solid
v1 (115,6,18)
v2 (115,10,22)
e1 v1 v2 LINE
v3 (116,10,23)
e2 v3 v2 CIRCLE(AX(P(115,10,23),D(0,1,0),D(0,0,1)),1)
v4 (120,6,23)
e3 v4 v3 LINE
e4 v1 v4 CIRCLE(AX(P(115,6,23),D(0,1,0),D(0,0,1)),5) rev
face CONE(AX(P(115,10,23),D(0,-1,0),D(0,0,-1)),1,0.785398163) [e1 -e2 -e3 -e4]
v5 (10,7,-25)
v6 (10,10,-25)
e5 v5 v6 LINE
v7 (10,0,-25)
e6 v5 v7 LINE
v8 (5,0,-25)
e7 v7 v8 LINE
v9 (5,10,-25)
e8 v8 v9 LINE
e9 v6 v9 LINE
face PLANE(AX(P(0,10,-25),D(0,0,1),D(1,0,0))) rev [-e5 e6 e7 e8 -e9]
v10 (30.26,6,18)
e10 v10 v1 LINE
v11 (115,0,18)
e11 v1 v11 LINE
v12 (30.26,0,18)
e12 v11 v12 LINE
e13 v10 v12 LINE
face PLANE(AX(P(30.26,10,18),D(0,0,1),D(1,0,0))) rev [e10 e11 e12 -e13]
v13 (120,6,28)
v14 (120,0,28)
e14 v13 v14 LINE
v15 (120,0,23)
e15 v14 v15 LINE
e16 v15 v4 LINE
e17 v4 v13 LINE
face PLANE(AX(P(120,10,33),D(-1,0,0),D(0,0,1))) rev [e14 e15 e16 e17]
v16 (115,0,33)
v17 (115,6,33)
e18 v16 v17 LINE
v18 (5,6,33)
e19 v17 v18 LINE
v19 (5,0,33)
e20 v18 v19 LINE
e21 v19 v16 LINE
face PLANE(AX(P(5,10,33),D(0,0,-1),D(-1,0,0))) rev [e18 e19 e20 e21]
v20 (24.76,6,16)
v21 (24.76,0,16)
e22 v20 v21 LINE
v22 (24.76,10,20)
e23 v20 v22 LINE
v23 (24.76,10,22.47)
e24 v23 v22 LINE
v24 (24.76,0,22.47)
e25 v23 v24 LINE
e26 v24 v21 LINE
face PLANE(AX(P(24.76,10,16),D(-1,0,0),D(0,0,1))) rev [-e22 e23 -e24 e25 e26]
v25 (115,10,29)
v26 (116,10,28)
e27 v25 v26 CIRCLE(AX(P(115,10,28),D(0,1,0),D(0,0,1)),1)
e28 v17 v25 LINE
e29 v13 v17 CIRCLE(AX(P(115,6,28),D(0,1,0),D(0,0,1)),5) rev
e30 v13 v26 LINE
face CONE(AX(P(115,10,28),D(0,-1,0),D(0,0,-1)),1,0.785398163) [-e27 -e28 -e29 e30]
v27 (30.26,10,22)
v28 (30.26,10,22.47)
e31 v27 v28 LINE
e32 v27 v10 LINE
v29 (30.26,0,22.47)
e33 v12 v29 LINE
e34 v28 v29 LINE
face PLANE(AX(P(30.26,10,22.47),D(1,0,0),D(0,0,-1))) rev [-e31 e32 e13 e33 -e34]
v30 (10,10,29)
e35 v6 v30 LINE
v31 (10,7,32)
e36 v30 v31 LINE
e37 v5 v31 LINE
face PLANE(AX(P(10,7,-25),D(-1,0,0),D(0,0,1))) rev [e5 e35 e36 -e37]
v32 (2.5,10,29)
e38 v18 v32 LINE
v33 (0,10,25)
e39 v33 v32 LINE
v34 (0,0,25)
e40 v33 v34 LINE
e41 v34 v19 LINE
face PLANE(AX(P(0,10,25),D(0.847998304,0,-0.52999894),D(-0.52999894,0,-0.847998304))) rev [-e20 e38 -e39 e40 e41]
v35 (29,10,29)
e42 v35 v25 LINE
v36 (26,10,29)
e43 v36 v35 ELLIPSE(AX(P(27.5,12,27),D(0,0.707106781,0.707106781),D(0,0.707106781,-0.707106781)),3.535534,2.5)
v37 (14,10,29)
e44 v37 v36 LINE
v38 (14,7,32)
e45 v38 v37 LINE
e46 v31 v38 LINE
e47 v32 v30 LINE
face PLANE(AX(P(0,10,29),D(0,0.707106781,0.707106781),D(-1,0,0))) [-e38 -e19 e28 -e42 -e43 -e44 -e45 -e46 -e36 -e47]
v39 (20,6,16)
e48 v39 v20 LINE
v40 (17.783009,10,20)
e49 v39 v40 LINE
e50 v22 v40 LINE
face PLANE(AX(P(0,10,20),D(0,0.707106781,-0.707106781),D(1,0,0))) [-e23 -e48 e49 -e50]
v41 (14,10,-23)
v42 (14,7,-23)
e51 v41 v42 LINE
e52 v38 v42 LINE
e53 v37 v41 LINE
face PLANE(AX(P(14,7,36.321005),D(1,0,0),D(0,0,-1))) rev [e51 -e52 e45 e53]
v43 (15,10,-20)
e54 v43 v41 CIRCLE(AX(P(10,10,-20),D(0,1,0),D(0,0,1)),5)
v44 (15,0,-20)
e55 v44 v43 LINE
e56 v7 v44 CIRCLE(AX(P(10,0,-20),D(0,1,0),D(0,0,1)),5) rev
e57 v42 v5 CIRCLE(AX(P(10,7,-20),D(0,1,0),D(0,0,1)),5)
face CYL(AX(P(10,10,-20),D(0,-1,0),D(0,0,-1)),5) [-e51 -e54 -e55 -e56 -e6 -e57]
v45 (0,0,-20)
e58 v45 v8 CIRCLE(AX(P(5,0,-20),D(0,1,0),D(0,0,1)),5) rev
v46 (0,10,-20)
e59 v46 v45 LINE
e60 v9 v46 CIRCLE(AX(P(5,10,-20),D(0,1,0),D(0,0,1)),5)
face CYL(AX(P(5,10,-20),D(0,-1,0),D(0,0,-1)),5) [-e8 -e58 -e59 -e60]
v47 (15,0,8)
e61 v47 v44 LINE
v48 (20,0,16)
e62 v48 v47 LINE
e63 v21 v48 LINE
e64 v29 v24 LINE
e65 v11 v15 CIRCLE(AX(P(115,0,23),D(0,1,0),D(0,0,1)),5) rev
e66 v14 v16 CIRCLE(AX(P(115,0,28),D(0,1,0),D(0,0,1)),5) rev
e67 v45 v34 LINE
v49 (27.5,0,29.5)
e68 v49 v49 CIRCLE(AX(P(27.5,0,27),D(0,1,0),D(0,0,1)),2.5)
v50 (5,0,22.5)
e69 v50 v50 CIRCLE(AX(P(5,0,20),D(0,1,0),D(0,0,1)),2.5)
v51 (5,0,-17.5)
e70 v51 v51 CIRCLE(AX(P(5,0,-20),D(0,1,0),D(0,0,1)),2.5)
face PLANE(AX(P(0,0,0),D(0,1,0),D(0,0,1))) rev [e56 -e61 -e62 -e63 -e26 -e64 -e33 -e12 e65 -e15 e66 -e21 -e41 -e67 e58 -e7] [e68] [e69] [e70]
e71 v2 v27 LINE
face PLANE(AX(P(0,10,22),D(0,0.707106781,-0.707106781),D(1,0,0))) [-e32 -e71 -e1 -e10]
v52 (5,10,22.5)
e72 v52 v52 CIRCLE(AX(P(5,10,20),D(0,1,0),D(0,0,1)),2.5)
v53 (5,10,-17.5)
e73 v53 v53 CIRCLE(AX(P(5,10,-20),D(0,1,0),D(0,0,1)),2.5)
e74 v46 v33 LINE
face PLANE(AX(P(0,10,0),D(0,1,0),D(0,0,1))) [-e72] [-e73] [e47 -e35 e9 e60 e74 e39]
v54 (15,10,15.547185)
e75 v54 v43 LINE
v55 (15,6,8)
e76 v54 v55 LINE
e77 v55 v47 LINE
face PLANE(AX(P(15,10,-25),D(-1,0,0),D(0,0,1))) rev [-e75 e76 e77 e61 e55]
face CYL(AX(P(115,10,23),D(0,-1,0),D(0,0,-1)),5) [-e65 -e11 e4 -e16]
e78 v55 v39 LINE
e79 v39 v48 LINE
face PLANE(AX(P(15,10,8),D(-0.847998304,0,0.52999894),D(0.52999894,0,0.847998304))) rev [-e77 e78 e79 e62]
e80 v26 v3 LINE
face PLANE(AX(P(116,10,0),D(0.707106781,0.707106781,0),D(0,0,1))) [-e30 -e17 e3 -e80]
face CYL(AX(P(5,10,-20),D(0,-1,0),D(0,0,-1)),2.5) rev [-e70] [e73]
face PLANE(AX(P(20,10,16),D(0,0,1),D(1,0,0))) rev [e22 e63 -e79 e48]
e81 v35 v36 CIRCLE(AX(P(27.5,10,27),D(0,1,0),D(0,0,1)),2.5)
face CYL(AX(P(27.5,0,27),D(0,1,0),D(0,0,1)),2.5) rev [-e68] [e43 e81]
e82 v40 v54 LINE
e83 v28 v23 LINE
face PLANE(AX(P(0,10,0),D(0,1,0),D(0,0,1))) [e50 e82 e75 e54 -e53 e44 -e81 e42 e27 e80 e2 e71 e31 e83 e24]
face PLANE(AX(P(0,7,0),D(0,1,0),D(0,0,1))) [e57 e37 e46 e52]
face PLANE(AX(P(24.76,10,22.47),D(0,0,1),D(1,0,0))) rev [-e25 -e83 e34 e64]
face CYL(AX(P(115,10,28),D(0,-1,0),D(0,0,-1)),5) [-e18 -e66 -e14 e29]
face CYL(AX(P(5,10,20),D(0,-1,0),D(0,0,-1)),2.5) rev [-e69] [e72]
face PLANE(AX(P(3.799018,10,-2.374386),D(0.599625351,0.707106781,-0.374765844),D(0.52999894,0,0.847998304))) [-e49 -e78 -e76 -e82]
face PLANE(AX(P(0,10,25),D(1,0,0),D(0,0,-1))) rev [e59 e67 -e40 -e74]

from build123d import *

# Parameters (mm, degrees)
SKETCH1_R           = 2.5
BOSS_EXTRUDE1_DEPTH = 10
SKETCH2_W           = 4
SKETCH2_H           = 61.321004691
CUT_EXTRUDE1_DEPTH  = 3
FILLET1_R           = 5
CHAMFER2_SIZE       = 4
CHAMFER3_SIZE       = 4
SKETCH3_R           = 2.5
CUT_EXTRUDE2_DEPTH  = 10


with BuildPart() as part:
    # Sketch1 → Boss-Extrude1 (new body)
    with BuildSketch(Plane(origin=(0, 0, 0), x_dir=(1, 0, 0), z_dir=(0, 1, 0))):
        Polygon((0, -25), (0, 25), (15, 25), (15, -8), (20, -16), (24.76, -16), (24.76, -22.47), (30.26, -22.47), (30.26, -18), (35, -18), (120, -18), (120, -33), (5, -33), align=None)
        with Locations((5, 20)):
            Circle(SKETCH1_R, mode=Mode.SUBTRACT)
        with Locations((5, -20)):
            Circle(SKETCH1_R, mode=Mode.SUBTRACT)
    extrude(amount=BOSS_EXTRUDE1_DEPTH)

    # Sketch2 → Cut-Extrude1 (cut)
    with BuildSketch(Plane(origin=(0, 10, 0), x_dir=(1, 0, 0), z_dir=(0, 1, 0))):
        with Locations((12, -5.660502345)):
            Rectangle(SKETCH2_W, SKETCH2_H)
    extrude(amount=-CUT_EXTRUDE1_DEPTH, mode=Mode.SUBTRACT)

    # Fillet1
    fillet1_edges = [part.edges().sort_by_distance(p)[0] for p in [
        (120, 5, 33),
        (120, 5, 18),
        (0, 5, -25),
        (15, 5, -25),
    ]]
    fillet(fillet1_edges, radius=FILLET1_R)

    # Chamfer2
    chamfer2_edges = [part.edges().sort_by_distance(p)[0] for p in [
        (118.535533906, 10, 31.535533906),
        (120, 10, 25.5),
        (118.535533906, 10, 19.464466094),
        (72.63, 10, 18),
        (64.5, 10, 33),
    ]]
    chamfer(chamfer2_edges, length=CHAMFER2_SIZE)

    # Chamfer3
    chamfer3_edges = [part.edges().sort_by_distance(p)[0] for p in [
        (22.38, 10, 16),
        (17.5, 10, 12),
    ]]
    chamfer(chamfer3_edges, length=CHAMFER3_SIZE)

    # Sketch3 → Cut-Extrude2 (cut)
    with BuildSketch(Plane(origin=(0, 10, 0), x_dir=(1, 0, 0), z_dir=(0, 1, 0))):
        with Locations((27.5, -27)):
            Circle(SKETCH3_R)
    extrude(amount=-CUT_EXTRUDE2_DEPTH, mode=Mode.SUBTRACT)


solid = part.part
